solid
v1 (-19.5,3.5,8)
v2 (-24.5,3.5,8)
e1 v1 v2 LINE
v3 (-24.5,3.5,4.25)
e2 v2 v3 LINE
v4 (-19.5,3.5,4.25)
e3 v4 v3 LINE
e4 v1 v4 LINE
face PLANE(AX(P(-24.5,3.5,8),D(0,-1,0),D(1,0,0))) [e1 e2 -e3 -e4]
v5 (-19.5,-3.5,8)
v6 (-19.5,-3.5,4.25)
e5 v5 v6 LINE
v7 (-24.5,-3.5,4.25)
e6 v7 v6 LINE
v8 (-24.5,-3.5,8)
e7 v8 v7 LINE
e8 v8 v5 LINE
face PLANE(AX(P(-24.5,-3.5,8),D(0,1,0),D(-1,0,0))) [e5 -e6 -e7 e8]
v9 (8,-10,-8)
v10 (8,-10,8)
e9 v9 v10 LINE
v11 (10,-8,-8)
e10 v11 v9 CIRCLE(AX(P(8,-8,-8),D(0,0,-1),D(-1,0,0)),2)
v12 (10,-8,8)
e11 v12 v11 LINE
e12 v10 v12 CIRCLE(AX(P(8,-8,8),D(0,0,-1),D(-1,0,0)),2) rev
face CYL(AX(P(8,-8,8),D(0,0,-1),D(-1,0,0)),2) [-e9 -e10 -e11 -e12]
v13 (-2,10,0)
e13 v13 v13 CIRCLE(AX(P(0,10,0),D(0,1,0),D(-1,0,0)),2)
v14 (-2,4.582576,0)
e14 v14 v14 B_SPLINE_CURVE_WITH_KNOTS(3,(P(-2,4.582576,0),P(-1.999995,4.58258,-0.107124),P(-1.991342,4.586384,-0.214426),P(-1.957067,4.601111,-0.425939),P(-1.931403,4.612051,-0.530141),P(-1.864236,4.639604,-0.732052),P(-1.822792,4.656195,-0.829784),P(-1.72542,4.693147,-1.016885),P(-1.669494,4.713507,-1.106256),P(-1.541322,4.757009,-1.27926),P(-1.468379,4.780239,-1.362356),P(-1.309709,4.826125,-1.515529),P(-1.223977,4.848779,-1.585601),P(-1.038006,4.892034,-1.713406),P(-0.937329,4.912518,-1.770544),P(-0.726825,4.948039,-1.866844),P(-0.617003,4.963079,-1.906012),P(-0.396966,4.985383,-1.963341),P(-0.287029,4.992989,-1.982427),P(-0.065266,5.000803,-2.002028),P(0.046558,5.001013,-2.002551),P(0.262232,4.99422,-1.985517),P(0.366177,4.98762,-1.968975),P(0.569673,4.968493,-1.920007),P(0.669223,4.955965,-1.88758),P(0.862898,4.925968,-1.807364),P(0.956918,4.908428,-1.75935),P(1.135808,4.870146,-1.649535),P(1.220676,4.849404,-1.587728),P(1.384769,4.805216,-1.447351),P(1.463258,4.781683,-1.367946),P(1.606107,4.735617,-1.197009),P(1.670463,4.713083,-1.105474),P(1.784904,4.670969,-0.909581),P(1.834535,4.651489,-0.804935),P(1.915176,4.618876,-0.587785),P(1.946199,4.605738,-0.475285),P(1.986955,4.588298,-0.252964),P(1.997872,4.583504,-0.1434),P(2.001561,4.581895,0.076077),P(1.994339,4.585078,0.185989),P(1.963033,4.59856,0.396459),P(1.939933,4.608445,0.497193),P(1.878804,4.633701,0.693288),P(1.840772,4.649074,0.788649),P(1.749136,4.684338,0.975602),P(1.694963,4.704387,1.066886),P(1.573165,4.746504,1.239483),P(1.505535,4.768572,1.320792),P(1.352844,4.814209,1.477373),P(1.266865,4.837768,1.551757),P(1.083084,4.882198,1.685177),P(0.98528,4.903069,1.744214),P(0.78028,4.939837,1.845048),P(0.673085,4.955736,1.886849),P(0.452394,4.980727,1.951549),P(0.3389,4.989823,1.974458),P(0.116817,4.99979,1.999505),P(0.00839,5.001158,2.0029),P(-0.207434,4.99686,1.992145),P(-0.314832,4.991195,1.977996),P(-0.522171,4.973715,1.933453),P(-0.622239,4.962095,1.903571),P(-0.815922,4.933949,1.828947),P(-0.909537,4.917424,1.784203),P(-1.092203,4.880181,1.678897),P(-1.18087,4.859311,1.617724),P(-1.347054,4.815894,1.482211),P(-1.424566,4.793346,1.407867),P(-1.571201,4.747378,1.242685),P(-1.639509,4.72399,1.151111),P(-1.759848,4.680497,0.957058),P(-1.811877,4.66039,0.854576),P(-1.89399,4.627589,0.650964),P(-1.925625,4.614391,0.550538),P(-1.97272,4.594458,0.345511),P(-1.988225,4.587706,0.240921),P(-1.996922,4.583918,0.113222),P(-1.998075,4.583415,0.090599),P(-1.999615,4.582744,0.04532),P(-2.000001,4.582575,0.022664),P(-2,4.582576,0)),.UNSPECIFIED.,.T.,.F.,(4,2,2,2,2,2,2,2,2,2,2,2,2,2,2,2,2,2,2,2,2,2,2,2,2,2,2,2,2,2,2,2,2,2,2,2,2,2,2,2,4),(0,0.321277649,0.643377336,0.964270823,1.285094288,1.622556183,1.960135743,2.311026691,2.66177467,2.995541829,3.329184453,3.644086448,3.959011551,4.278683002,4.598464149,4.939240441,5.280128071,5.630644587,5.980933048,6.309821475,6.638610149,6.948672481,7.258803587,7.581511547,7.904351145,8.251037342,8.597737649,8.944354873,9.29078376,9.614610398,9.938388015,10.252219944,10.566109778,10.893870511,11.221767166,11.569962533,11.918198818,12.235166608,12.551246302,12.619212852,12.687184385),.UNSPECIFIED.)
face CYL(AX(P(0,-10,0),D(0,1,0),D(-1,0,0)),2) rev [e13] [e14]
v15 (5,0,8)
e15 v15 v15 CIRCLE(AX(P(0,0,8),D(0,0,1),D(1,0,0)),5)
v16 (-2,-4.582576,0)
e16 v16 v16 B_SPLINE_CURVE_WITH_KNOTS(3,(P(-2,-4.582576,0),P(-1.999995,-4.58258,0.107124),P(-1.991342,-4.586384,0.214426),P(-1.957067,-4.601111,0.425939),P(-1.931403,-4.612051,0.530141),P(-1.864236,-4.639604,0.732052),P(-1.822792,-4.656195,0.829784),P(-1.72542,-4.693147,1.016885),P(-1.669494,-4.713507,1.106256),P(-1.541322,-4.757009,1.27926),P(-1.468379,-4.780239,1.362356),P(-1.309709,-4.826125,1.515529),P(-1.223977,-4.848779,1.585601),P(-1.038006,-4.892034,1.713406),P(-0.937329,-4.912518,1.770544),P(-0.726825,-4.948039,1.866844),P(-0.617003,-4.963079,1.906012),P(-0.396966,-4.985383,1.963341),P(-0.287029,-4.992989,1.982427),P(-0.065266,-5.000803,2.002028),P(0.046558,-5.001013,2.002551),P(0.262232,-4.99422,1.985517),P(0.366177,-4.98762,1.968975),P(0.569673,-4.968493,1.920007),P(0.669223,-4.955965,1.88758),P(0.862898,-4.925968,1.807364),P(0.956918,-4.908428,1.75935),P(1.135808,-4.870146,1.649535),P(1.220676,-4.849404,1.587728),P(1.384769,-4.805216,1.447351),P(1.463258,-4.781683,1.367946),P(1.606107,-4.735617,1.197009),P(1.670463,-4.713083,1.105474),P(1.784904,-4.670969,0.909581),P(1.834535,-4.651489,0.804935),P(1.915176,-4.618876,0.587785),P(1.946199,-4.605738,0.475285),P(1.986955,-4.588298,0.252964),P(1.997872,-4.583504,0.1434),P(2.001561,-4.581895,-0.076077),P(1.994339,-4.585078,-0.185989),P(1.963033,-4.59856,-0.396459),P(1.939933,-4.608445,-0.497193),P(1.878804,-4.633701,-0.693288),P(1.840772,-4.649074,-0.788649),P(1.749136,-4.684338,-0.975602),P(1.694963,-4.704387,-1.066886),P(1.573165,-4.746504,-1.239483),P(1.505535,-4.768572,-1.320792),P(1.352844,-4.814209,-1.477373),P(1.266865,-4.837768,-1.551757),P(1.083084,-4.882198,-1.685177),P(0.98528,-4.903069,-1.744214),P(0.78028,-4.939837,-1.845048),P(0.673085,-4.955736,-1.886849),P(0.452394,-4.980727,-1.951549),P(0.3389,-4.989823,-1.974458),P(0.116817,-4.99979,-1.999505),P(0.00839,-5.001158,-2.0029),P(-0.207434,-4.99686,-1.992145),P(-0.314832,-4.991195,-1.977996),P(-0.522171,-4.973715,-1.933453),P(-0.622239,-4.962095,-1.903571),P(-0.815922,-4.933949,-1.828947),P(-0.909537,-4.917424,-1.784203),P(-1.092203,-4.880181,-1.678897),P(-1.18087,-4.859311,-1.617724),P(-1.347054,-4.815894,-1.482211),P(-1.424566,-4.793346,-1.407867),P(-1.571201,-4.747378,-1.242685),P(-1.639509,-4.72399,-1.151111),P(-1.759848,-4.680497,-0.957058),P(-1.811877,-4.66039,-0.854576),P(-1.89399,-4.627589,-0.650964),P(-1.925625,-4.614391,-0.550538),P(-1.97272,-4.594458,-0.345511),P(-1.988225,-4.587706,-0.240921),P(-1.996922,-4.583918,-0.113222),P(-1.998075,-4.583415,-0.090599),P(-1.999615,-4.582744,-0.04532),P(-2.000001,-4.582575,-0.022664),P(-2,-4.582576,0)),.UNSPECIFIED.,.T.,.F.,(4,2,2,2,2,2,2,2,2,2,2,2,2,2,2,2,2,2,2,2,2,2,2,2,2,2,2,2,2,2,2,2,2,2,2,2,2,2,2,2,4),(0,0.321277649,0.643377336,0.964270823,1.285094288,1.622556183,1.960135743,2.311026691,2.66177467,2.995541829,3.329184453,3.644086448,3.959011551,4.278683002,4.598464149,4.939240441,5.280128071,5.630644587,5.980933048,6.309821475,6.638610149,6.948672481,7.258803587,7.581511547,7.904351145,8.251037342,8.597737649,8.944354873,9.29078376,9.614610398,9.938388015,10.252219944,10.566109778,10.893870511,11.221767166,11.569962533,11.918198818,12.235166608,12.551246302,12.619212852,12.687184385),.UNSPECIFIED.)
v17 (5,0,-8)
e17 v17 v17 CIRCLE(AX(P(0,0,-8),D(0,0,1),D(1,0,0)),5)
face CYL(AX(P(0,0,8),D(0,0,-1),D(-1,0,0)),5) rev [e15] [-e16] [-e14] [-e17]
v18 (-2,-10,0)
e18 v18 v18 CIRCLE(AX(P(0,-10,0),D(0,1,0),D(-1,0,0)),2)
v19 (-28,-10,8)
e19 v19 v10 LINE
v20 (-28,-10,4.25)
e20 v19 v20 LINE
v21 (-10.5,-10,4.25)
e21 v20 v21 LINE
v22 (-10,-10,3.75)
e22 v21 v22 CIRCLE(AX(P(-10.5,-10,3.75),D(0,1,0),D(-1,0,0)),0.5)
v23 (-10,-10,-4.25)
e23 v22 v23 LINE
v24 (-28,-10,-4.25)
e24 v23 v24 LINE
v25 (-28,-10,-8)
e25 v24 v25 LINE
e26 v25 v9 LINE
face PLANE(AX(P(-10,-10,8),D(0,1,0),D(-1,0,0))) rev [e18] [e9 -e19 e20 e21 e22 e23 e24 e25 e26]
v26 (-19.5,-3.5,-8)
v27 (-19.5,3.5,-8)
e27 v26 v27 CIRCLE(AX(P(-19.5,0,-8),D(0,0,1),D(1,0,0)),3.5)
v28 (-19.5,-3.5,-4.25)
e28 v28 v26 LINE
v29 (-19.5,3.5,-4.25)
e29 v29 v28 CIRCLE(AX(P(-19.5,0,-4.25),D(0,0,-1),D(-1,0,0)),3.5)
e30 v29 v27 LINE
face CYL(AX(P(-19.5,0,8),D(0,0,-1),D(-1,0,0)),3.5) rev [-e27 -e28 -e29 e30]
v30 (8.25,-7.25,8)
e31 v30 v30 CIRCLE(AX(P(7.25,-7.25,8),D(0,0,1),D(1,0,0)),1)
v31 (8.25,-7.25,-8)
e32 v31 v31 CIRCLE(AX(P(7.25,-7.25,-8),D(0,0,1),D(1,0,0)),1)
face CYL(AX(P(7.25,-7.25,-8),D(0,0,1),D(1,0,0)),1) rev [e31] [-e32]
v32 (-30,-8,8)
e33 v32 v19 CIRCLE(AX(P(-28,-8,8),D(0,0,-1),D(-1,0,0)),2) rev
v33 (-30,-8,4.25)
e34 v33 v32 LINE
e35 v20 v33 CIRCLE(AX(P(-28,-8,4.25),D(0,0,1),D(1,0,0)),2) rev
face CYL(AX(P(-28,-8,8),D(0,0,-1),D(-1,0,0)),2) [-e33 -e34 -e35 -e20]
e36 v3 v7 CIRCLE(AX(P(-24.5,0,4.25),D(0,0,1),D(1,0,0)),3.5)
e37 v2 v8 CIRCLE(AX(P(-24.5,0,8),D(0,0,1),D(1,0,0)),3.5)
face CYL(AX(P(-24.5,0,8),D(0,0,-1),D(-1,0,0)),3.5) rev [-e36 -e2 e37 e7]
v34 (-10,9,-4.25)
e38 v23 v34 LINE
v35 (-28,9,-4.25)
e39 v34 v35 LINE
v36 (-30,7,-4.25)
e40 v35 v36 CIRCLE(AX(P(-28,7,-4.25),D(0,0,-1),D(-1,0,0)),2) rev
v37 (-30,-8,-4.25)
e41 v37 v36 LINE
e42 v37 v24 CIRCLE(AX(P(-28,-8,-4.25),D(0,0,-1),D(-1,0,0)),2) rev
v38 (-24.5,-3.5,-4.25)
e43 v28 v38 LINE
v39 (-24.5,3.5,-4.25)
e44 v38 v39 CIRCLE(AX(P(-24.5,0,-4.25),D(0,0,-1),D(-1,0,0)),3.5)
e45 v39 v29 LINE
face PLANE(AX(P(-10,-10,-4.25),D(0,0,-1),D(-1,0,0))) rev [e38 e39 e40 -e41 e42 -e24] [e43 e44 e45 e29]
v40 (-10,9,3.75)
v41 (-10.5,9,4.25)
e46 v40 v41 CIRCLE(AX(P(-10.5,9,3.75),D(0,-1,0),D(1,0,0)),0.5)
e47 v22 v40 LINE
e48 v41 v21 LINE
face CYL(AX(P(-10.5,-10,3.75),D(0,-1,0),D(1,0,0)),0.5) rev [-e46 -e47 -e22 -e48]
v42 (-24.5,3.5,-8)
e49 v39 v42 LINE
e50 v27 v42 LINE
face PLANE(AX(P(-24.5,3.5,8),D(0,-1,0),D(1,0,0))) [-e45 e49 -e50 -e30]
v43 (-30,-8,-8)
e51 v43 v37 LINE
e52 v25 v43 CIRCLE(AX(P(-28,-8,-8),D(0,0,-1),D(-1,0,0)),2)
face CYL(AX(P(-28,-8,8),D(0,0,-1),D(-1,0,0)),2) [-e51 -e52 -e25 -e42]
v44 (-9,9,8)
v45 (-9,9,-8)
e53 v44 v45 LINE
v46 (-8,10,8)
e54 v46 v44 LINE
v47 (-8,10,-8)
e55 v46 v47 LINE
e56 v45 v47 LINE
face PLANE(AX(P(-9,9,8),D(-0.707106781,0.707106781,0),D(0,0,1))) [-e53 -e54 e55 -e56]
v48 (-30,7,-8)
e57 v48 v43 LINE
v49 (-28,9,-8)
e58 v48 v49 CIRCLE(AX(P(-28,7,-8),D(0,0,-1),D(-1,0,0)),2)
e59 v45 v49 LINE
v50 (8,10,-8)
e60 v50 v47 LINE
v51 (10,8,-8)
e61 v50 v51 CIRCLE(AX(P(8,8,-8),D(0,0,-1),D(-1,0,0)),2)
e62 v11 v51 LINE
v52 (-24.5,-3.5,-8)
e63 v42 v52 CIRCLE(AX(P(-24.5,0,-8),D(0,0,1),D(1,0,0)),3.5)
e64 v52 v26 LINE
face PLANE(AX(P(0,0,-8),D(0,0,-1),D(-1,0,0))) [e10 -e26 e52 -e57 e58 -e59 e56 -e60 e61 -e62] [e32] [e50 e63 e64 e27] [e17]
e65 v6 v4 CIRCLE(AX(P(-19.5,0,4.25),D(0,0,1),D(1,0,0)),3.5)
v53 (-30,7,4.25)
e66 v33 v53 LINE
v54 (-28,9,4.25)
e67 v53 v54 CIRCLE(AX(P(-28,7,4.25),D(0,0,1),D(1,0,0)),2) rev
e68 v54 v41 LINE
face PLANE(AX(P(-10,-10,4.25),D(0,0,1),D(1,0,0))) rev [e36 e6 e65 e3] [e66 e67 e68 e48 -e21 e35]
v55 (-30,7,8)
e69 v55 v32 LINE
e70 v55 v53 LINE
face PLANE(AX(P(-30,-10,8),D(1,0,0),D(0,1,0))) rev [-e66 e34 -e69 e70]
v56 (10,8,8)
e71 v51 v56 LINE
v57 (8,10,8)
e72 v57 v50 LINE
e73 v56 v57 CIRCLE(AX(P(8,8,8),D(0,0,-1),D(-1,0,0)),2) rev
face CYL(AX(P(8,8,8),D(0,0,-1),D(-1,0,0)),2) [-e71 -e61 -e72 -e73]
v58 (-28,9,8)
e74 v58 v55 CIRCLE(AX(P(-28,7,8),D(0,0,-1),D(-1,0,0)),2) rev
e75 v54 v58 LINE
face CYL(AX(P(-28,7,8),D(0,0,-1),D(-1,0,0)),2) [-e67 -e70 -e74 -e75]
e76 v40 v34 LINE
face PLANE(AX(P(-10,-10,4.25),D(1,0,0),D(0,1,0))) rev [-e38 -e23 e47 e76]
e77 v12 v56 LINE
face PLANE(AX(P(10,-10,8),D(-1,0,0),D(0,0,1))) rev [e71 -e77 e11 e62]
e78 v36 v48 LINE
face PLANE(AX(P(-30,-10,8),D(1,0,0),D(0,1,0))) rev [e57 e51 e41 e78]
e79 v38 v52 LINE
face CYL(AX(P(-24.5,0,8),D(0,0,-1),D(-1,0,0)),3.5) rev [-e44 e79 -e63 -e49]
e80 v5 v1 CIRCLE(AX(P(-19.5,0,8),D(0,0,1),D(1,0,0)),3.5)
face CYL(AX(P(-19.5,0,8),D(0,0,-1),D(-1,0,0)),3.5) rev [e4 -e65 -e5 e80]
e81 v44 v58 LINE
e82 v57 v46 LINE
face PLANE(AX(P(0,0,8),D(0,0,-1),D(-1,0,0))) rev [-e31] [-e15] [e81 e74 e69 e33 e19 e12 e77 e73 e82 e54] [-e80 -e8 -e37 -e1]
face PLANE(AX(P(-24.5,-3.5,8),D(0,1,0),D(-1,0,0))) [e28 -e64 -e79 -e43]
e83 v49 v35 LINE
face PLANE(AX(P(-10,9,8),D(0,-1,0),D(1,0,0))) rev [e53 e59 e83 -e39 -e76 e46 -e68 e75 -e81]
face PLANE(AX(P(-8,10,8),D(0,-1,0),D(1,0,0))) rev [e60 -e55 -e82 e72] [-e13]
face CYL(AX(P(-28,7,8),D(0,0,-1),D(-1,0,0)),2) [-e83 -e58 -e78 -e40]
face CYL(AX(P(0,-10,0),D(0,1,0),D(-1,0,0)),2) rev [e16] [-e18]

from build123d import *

# Parameters (mm, degrees)
SKETCH_1_R          = 5
EXTRUDE_1_DEPTH     = 8
CHAMFER_1_SIZE      = 1
FILLET_1_R          = 2
SKETCH_2_W          = 20
SKETCH_2_H          = 8.5
CUT_EXTRUDE_1_DEPTH = 37.400549446
SKETCH_3_R          = 1
CUT_EXTRUDE_2_DEPTH = 36.440090293
FILLET_2_R          = 0.5
SKETCH_4_R          = 2
CUT_EXTRUDE_3_DEPTH = 37.932370625


with BuildPart() as part:
    # 草图1 → 凸台-拉伸1 (new, symmetric)
    with BuildSketch(Plane.XY):
        Polygon((-10, -10), (10, -10), (10, 10), (-8, 10), (-8, 9), (-10, 9), (-30, 9), (-30, -10), align=None)
        Circle(SKETCH_1_R, mode=Mode.SUBTRACT)
        with BuildLine():
            Line((-24.5, 3.5), (-19.5, 3.5))
            ThreePointArc((-19.5, 3.5), (-16, 0), (-19.5, -3.5))
            Line((-19.5, -3.5), (-24.5, -3.5))
            ThreePointArc((-24.5, -3.5), (-28, 0), (-24.5, 3.5))
        make_face(mode=Mode.SUBTRACT)
    extrude(amount=EXTRUDE_1_DEPTH, both=True)

    # 倒角1
    chamfer_1_edges = [part.edges().sort_by_distance(p)[0] for p in [
        (-8, 9, 0),
    ]]
    chamfer(chamfer_1_edges, length=CHAMFER_1_SIZE - 0.0001)  # a hair under: the kernel refuses the full size

    # 圆角1
    fillet_1_edges = [part.edges().sort_by_distance(p)[0] for p in [
        (10, -10, 0),
        (-30, -10, 0),
        (-30, 9, 0),
        (10, 10, 0),
    ]]
    fillet(fillet_1_edges, radius=FILLET_1_R)

    # 草图2 → 切除-拉伸1 (cut, through all)
    with BuildSketch(Plane(origin=(0, 9, 0), x_dir=(1, 0, 0), z_dir=(0, 1, 0))):
        with Locations((-20, 0)):
            Rectangle(SKETCH_2_W, SKETCH_2_H)
    extrude(amount=-CUT_EXTRUDE_1_DEPTH, mode=Mode.SUBTRACT)

    # 草图3 → 切除-拉伸2 (cut, through all)
    with BuildSketch(Plane.XY.offset(8)):
        with Locations((7.25, -7.25)):
            Circle(SKETCH_3_R)
    extrude(amount=-CUT_EXTRUDE_2_DEPTH, mode=Mode.SUBTRACT)

    # 圆角2
    fillet_2_edges = [part.edges().sort_by_distance(p)[0] for p in [
        (-10, -0.5, 4.25),
    ]]
    fillet(fillet_2_edges, radius=FILLET_2_R)

    # 草图4 → 切除-拉伸3 (cut, through all)
    with BuildSketch(Plane(origin=(0, 10, 0), x_dir=(1, 0, 0), z_dir=(0, 1, 0))):
        with Locations(Location((0, 0, 0), (0, 0, 180))):
            Circle(SKETCH_4_R)
    extrude(amount=-CUT_EXTRUDE_3_DEPTH, mode=Mode.SUBTRACT)


solid = part.part
